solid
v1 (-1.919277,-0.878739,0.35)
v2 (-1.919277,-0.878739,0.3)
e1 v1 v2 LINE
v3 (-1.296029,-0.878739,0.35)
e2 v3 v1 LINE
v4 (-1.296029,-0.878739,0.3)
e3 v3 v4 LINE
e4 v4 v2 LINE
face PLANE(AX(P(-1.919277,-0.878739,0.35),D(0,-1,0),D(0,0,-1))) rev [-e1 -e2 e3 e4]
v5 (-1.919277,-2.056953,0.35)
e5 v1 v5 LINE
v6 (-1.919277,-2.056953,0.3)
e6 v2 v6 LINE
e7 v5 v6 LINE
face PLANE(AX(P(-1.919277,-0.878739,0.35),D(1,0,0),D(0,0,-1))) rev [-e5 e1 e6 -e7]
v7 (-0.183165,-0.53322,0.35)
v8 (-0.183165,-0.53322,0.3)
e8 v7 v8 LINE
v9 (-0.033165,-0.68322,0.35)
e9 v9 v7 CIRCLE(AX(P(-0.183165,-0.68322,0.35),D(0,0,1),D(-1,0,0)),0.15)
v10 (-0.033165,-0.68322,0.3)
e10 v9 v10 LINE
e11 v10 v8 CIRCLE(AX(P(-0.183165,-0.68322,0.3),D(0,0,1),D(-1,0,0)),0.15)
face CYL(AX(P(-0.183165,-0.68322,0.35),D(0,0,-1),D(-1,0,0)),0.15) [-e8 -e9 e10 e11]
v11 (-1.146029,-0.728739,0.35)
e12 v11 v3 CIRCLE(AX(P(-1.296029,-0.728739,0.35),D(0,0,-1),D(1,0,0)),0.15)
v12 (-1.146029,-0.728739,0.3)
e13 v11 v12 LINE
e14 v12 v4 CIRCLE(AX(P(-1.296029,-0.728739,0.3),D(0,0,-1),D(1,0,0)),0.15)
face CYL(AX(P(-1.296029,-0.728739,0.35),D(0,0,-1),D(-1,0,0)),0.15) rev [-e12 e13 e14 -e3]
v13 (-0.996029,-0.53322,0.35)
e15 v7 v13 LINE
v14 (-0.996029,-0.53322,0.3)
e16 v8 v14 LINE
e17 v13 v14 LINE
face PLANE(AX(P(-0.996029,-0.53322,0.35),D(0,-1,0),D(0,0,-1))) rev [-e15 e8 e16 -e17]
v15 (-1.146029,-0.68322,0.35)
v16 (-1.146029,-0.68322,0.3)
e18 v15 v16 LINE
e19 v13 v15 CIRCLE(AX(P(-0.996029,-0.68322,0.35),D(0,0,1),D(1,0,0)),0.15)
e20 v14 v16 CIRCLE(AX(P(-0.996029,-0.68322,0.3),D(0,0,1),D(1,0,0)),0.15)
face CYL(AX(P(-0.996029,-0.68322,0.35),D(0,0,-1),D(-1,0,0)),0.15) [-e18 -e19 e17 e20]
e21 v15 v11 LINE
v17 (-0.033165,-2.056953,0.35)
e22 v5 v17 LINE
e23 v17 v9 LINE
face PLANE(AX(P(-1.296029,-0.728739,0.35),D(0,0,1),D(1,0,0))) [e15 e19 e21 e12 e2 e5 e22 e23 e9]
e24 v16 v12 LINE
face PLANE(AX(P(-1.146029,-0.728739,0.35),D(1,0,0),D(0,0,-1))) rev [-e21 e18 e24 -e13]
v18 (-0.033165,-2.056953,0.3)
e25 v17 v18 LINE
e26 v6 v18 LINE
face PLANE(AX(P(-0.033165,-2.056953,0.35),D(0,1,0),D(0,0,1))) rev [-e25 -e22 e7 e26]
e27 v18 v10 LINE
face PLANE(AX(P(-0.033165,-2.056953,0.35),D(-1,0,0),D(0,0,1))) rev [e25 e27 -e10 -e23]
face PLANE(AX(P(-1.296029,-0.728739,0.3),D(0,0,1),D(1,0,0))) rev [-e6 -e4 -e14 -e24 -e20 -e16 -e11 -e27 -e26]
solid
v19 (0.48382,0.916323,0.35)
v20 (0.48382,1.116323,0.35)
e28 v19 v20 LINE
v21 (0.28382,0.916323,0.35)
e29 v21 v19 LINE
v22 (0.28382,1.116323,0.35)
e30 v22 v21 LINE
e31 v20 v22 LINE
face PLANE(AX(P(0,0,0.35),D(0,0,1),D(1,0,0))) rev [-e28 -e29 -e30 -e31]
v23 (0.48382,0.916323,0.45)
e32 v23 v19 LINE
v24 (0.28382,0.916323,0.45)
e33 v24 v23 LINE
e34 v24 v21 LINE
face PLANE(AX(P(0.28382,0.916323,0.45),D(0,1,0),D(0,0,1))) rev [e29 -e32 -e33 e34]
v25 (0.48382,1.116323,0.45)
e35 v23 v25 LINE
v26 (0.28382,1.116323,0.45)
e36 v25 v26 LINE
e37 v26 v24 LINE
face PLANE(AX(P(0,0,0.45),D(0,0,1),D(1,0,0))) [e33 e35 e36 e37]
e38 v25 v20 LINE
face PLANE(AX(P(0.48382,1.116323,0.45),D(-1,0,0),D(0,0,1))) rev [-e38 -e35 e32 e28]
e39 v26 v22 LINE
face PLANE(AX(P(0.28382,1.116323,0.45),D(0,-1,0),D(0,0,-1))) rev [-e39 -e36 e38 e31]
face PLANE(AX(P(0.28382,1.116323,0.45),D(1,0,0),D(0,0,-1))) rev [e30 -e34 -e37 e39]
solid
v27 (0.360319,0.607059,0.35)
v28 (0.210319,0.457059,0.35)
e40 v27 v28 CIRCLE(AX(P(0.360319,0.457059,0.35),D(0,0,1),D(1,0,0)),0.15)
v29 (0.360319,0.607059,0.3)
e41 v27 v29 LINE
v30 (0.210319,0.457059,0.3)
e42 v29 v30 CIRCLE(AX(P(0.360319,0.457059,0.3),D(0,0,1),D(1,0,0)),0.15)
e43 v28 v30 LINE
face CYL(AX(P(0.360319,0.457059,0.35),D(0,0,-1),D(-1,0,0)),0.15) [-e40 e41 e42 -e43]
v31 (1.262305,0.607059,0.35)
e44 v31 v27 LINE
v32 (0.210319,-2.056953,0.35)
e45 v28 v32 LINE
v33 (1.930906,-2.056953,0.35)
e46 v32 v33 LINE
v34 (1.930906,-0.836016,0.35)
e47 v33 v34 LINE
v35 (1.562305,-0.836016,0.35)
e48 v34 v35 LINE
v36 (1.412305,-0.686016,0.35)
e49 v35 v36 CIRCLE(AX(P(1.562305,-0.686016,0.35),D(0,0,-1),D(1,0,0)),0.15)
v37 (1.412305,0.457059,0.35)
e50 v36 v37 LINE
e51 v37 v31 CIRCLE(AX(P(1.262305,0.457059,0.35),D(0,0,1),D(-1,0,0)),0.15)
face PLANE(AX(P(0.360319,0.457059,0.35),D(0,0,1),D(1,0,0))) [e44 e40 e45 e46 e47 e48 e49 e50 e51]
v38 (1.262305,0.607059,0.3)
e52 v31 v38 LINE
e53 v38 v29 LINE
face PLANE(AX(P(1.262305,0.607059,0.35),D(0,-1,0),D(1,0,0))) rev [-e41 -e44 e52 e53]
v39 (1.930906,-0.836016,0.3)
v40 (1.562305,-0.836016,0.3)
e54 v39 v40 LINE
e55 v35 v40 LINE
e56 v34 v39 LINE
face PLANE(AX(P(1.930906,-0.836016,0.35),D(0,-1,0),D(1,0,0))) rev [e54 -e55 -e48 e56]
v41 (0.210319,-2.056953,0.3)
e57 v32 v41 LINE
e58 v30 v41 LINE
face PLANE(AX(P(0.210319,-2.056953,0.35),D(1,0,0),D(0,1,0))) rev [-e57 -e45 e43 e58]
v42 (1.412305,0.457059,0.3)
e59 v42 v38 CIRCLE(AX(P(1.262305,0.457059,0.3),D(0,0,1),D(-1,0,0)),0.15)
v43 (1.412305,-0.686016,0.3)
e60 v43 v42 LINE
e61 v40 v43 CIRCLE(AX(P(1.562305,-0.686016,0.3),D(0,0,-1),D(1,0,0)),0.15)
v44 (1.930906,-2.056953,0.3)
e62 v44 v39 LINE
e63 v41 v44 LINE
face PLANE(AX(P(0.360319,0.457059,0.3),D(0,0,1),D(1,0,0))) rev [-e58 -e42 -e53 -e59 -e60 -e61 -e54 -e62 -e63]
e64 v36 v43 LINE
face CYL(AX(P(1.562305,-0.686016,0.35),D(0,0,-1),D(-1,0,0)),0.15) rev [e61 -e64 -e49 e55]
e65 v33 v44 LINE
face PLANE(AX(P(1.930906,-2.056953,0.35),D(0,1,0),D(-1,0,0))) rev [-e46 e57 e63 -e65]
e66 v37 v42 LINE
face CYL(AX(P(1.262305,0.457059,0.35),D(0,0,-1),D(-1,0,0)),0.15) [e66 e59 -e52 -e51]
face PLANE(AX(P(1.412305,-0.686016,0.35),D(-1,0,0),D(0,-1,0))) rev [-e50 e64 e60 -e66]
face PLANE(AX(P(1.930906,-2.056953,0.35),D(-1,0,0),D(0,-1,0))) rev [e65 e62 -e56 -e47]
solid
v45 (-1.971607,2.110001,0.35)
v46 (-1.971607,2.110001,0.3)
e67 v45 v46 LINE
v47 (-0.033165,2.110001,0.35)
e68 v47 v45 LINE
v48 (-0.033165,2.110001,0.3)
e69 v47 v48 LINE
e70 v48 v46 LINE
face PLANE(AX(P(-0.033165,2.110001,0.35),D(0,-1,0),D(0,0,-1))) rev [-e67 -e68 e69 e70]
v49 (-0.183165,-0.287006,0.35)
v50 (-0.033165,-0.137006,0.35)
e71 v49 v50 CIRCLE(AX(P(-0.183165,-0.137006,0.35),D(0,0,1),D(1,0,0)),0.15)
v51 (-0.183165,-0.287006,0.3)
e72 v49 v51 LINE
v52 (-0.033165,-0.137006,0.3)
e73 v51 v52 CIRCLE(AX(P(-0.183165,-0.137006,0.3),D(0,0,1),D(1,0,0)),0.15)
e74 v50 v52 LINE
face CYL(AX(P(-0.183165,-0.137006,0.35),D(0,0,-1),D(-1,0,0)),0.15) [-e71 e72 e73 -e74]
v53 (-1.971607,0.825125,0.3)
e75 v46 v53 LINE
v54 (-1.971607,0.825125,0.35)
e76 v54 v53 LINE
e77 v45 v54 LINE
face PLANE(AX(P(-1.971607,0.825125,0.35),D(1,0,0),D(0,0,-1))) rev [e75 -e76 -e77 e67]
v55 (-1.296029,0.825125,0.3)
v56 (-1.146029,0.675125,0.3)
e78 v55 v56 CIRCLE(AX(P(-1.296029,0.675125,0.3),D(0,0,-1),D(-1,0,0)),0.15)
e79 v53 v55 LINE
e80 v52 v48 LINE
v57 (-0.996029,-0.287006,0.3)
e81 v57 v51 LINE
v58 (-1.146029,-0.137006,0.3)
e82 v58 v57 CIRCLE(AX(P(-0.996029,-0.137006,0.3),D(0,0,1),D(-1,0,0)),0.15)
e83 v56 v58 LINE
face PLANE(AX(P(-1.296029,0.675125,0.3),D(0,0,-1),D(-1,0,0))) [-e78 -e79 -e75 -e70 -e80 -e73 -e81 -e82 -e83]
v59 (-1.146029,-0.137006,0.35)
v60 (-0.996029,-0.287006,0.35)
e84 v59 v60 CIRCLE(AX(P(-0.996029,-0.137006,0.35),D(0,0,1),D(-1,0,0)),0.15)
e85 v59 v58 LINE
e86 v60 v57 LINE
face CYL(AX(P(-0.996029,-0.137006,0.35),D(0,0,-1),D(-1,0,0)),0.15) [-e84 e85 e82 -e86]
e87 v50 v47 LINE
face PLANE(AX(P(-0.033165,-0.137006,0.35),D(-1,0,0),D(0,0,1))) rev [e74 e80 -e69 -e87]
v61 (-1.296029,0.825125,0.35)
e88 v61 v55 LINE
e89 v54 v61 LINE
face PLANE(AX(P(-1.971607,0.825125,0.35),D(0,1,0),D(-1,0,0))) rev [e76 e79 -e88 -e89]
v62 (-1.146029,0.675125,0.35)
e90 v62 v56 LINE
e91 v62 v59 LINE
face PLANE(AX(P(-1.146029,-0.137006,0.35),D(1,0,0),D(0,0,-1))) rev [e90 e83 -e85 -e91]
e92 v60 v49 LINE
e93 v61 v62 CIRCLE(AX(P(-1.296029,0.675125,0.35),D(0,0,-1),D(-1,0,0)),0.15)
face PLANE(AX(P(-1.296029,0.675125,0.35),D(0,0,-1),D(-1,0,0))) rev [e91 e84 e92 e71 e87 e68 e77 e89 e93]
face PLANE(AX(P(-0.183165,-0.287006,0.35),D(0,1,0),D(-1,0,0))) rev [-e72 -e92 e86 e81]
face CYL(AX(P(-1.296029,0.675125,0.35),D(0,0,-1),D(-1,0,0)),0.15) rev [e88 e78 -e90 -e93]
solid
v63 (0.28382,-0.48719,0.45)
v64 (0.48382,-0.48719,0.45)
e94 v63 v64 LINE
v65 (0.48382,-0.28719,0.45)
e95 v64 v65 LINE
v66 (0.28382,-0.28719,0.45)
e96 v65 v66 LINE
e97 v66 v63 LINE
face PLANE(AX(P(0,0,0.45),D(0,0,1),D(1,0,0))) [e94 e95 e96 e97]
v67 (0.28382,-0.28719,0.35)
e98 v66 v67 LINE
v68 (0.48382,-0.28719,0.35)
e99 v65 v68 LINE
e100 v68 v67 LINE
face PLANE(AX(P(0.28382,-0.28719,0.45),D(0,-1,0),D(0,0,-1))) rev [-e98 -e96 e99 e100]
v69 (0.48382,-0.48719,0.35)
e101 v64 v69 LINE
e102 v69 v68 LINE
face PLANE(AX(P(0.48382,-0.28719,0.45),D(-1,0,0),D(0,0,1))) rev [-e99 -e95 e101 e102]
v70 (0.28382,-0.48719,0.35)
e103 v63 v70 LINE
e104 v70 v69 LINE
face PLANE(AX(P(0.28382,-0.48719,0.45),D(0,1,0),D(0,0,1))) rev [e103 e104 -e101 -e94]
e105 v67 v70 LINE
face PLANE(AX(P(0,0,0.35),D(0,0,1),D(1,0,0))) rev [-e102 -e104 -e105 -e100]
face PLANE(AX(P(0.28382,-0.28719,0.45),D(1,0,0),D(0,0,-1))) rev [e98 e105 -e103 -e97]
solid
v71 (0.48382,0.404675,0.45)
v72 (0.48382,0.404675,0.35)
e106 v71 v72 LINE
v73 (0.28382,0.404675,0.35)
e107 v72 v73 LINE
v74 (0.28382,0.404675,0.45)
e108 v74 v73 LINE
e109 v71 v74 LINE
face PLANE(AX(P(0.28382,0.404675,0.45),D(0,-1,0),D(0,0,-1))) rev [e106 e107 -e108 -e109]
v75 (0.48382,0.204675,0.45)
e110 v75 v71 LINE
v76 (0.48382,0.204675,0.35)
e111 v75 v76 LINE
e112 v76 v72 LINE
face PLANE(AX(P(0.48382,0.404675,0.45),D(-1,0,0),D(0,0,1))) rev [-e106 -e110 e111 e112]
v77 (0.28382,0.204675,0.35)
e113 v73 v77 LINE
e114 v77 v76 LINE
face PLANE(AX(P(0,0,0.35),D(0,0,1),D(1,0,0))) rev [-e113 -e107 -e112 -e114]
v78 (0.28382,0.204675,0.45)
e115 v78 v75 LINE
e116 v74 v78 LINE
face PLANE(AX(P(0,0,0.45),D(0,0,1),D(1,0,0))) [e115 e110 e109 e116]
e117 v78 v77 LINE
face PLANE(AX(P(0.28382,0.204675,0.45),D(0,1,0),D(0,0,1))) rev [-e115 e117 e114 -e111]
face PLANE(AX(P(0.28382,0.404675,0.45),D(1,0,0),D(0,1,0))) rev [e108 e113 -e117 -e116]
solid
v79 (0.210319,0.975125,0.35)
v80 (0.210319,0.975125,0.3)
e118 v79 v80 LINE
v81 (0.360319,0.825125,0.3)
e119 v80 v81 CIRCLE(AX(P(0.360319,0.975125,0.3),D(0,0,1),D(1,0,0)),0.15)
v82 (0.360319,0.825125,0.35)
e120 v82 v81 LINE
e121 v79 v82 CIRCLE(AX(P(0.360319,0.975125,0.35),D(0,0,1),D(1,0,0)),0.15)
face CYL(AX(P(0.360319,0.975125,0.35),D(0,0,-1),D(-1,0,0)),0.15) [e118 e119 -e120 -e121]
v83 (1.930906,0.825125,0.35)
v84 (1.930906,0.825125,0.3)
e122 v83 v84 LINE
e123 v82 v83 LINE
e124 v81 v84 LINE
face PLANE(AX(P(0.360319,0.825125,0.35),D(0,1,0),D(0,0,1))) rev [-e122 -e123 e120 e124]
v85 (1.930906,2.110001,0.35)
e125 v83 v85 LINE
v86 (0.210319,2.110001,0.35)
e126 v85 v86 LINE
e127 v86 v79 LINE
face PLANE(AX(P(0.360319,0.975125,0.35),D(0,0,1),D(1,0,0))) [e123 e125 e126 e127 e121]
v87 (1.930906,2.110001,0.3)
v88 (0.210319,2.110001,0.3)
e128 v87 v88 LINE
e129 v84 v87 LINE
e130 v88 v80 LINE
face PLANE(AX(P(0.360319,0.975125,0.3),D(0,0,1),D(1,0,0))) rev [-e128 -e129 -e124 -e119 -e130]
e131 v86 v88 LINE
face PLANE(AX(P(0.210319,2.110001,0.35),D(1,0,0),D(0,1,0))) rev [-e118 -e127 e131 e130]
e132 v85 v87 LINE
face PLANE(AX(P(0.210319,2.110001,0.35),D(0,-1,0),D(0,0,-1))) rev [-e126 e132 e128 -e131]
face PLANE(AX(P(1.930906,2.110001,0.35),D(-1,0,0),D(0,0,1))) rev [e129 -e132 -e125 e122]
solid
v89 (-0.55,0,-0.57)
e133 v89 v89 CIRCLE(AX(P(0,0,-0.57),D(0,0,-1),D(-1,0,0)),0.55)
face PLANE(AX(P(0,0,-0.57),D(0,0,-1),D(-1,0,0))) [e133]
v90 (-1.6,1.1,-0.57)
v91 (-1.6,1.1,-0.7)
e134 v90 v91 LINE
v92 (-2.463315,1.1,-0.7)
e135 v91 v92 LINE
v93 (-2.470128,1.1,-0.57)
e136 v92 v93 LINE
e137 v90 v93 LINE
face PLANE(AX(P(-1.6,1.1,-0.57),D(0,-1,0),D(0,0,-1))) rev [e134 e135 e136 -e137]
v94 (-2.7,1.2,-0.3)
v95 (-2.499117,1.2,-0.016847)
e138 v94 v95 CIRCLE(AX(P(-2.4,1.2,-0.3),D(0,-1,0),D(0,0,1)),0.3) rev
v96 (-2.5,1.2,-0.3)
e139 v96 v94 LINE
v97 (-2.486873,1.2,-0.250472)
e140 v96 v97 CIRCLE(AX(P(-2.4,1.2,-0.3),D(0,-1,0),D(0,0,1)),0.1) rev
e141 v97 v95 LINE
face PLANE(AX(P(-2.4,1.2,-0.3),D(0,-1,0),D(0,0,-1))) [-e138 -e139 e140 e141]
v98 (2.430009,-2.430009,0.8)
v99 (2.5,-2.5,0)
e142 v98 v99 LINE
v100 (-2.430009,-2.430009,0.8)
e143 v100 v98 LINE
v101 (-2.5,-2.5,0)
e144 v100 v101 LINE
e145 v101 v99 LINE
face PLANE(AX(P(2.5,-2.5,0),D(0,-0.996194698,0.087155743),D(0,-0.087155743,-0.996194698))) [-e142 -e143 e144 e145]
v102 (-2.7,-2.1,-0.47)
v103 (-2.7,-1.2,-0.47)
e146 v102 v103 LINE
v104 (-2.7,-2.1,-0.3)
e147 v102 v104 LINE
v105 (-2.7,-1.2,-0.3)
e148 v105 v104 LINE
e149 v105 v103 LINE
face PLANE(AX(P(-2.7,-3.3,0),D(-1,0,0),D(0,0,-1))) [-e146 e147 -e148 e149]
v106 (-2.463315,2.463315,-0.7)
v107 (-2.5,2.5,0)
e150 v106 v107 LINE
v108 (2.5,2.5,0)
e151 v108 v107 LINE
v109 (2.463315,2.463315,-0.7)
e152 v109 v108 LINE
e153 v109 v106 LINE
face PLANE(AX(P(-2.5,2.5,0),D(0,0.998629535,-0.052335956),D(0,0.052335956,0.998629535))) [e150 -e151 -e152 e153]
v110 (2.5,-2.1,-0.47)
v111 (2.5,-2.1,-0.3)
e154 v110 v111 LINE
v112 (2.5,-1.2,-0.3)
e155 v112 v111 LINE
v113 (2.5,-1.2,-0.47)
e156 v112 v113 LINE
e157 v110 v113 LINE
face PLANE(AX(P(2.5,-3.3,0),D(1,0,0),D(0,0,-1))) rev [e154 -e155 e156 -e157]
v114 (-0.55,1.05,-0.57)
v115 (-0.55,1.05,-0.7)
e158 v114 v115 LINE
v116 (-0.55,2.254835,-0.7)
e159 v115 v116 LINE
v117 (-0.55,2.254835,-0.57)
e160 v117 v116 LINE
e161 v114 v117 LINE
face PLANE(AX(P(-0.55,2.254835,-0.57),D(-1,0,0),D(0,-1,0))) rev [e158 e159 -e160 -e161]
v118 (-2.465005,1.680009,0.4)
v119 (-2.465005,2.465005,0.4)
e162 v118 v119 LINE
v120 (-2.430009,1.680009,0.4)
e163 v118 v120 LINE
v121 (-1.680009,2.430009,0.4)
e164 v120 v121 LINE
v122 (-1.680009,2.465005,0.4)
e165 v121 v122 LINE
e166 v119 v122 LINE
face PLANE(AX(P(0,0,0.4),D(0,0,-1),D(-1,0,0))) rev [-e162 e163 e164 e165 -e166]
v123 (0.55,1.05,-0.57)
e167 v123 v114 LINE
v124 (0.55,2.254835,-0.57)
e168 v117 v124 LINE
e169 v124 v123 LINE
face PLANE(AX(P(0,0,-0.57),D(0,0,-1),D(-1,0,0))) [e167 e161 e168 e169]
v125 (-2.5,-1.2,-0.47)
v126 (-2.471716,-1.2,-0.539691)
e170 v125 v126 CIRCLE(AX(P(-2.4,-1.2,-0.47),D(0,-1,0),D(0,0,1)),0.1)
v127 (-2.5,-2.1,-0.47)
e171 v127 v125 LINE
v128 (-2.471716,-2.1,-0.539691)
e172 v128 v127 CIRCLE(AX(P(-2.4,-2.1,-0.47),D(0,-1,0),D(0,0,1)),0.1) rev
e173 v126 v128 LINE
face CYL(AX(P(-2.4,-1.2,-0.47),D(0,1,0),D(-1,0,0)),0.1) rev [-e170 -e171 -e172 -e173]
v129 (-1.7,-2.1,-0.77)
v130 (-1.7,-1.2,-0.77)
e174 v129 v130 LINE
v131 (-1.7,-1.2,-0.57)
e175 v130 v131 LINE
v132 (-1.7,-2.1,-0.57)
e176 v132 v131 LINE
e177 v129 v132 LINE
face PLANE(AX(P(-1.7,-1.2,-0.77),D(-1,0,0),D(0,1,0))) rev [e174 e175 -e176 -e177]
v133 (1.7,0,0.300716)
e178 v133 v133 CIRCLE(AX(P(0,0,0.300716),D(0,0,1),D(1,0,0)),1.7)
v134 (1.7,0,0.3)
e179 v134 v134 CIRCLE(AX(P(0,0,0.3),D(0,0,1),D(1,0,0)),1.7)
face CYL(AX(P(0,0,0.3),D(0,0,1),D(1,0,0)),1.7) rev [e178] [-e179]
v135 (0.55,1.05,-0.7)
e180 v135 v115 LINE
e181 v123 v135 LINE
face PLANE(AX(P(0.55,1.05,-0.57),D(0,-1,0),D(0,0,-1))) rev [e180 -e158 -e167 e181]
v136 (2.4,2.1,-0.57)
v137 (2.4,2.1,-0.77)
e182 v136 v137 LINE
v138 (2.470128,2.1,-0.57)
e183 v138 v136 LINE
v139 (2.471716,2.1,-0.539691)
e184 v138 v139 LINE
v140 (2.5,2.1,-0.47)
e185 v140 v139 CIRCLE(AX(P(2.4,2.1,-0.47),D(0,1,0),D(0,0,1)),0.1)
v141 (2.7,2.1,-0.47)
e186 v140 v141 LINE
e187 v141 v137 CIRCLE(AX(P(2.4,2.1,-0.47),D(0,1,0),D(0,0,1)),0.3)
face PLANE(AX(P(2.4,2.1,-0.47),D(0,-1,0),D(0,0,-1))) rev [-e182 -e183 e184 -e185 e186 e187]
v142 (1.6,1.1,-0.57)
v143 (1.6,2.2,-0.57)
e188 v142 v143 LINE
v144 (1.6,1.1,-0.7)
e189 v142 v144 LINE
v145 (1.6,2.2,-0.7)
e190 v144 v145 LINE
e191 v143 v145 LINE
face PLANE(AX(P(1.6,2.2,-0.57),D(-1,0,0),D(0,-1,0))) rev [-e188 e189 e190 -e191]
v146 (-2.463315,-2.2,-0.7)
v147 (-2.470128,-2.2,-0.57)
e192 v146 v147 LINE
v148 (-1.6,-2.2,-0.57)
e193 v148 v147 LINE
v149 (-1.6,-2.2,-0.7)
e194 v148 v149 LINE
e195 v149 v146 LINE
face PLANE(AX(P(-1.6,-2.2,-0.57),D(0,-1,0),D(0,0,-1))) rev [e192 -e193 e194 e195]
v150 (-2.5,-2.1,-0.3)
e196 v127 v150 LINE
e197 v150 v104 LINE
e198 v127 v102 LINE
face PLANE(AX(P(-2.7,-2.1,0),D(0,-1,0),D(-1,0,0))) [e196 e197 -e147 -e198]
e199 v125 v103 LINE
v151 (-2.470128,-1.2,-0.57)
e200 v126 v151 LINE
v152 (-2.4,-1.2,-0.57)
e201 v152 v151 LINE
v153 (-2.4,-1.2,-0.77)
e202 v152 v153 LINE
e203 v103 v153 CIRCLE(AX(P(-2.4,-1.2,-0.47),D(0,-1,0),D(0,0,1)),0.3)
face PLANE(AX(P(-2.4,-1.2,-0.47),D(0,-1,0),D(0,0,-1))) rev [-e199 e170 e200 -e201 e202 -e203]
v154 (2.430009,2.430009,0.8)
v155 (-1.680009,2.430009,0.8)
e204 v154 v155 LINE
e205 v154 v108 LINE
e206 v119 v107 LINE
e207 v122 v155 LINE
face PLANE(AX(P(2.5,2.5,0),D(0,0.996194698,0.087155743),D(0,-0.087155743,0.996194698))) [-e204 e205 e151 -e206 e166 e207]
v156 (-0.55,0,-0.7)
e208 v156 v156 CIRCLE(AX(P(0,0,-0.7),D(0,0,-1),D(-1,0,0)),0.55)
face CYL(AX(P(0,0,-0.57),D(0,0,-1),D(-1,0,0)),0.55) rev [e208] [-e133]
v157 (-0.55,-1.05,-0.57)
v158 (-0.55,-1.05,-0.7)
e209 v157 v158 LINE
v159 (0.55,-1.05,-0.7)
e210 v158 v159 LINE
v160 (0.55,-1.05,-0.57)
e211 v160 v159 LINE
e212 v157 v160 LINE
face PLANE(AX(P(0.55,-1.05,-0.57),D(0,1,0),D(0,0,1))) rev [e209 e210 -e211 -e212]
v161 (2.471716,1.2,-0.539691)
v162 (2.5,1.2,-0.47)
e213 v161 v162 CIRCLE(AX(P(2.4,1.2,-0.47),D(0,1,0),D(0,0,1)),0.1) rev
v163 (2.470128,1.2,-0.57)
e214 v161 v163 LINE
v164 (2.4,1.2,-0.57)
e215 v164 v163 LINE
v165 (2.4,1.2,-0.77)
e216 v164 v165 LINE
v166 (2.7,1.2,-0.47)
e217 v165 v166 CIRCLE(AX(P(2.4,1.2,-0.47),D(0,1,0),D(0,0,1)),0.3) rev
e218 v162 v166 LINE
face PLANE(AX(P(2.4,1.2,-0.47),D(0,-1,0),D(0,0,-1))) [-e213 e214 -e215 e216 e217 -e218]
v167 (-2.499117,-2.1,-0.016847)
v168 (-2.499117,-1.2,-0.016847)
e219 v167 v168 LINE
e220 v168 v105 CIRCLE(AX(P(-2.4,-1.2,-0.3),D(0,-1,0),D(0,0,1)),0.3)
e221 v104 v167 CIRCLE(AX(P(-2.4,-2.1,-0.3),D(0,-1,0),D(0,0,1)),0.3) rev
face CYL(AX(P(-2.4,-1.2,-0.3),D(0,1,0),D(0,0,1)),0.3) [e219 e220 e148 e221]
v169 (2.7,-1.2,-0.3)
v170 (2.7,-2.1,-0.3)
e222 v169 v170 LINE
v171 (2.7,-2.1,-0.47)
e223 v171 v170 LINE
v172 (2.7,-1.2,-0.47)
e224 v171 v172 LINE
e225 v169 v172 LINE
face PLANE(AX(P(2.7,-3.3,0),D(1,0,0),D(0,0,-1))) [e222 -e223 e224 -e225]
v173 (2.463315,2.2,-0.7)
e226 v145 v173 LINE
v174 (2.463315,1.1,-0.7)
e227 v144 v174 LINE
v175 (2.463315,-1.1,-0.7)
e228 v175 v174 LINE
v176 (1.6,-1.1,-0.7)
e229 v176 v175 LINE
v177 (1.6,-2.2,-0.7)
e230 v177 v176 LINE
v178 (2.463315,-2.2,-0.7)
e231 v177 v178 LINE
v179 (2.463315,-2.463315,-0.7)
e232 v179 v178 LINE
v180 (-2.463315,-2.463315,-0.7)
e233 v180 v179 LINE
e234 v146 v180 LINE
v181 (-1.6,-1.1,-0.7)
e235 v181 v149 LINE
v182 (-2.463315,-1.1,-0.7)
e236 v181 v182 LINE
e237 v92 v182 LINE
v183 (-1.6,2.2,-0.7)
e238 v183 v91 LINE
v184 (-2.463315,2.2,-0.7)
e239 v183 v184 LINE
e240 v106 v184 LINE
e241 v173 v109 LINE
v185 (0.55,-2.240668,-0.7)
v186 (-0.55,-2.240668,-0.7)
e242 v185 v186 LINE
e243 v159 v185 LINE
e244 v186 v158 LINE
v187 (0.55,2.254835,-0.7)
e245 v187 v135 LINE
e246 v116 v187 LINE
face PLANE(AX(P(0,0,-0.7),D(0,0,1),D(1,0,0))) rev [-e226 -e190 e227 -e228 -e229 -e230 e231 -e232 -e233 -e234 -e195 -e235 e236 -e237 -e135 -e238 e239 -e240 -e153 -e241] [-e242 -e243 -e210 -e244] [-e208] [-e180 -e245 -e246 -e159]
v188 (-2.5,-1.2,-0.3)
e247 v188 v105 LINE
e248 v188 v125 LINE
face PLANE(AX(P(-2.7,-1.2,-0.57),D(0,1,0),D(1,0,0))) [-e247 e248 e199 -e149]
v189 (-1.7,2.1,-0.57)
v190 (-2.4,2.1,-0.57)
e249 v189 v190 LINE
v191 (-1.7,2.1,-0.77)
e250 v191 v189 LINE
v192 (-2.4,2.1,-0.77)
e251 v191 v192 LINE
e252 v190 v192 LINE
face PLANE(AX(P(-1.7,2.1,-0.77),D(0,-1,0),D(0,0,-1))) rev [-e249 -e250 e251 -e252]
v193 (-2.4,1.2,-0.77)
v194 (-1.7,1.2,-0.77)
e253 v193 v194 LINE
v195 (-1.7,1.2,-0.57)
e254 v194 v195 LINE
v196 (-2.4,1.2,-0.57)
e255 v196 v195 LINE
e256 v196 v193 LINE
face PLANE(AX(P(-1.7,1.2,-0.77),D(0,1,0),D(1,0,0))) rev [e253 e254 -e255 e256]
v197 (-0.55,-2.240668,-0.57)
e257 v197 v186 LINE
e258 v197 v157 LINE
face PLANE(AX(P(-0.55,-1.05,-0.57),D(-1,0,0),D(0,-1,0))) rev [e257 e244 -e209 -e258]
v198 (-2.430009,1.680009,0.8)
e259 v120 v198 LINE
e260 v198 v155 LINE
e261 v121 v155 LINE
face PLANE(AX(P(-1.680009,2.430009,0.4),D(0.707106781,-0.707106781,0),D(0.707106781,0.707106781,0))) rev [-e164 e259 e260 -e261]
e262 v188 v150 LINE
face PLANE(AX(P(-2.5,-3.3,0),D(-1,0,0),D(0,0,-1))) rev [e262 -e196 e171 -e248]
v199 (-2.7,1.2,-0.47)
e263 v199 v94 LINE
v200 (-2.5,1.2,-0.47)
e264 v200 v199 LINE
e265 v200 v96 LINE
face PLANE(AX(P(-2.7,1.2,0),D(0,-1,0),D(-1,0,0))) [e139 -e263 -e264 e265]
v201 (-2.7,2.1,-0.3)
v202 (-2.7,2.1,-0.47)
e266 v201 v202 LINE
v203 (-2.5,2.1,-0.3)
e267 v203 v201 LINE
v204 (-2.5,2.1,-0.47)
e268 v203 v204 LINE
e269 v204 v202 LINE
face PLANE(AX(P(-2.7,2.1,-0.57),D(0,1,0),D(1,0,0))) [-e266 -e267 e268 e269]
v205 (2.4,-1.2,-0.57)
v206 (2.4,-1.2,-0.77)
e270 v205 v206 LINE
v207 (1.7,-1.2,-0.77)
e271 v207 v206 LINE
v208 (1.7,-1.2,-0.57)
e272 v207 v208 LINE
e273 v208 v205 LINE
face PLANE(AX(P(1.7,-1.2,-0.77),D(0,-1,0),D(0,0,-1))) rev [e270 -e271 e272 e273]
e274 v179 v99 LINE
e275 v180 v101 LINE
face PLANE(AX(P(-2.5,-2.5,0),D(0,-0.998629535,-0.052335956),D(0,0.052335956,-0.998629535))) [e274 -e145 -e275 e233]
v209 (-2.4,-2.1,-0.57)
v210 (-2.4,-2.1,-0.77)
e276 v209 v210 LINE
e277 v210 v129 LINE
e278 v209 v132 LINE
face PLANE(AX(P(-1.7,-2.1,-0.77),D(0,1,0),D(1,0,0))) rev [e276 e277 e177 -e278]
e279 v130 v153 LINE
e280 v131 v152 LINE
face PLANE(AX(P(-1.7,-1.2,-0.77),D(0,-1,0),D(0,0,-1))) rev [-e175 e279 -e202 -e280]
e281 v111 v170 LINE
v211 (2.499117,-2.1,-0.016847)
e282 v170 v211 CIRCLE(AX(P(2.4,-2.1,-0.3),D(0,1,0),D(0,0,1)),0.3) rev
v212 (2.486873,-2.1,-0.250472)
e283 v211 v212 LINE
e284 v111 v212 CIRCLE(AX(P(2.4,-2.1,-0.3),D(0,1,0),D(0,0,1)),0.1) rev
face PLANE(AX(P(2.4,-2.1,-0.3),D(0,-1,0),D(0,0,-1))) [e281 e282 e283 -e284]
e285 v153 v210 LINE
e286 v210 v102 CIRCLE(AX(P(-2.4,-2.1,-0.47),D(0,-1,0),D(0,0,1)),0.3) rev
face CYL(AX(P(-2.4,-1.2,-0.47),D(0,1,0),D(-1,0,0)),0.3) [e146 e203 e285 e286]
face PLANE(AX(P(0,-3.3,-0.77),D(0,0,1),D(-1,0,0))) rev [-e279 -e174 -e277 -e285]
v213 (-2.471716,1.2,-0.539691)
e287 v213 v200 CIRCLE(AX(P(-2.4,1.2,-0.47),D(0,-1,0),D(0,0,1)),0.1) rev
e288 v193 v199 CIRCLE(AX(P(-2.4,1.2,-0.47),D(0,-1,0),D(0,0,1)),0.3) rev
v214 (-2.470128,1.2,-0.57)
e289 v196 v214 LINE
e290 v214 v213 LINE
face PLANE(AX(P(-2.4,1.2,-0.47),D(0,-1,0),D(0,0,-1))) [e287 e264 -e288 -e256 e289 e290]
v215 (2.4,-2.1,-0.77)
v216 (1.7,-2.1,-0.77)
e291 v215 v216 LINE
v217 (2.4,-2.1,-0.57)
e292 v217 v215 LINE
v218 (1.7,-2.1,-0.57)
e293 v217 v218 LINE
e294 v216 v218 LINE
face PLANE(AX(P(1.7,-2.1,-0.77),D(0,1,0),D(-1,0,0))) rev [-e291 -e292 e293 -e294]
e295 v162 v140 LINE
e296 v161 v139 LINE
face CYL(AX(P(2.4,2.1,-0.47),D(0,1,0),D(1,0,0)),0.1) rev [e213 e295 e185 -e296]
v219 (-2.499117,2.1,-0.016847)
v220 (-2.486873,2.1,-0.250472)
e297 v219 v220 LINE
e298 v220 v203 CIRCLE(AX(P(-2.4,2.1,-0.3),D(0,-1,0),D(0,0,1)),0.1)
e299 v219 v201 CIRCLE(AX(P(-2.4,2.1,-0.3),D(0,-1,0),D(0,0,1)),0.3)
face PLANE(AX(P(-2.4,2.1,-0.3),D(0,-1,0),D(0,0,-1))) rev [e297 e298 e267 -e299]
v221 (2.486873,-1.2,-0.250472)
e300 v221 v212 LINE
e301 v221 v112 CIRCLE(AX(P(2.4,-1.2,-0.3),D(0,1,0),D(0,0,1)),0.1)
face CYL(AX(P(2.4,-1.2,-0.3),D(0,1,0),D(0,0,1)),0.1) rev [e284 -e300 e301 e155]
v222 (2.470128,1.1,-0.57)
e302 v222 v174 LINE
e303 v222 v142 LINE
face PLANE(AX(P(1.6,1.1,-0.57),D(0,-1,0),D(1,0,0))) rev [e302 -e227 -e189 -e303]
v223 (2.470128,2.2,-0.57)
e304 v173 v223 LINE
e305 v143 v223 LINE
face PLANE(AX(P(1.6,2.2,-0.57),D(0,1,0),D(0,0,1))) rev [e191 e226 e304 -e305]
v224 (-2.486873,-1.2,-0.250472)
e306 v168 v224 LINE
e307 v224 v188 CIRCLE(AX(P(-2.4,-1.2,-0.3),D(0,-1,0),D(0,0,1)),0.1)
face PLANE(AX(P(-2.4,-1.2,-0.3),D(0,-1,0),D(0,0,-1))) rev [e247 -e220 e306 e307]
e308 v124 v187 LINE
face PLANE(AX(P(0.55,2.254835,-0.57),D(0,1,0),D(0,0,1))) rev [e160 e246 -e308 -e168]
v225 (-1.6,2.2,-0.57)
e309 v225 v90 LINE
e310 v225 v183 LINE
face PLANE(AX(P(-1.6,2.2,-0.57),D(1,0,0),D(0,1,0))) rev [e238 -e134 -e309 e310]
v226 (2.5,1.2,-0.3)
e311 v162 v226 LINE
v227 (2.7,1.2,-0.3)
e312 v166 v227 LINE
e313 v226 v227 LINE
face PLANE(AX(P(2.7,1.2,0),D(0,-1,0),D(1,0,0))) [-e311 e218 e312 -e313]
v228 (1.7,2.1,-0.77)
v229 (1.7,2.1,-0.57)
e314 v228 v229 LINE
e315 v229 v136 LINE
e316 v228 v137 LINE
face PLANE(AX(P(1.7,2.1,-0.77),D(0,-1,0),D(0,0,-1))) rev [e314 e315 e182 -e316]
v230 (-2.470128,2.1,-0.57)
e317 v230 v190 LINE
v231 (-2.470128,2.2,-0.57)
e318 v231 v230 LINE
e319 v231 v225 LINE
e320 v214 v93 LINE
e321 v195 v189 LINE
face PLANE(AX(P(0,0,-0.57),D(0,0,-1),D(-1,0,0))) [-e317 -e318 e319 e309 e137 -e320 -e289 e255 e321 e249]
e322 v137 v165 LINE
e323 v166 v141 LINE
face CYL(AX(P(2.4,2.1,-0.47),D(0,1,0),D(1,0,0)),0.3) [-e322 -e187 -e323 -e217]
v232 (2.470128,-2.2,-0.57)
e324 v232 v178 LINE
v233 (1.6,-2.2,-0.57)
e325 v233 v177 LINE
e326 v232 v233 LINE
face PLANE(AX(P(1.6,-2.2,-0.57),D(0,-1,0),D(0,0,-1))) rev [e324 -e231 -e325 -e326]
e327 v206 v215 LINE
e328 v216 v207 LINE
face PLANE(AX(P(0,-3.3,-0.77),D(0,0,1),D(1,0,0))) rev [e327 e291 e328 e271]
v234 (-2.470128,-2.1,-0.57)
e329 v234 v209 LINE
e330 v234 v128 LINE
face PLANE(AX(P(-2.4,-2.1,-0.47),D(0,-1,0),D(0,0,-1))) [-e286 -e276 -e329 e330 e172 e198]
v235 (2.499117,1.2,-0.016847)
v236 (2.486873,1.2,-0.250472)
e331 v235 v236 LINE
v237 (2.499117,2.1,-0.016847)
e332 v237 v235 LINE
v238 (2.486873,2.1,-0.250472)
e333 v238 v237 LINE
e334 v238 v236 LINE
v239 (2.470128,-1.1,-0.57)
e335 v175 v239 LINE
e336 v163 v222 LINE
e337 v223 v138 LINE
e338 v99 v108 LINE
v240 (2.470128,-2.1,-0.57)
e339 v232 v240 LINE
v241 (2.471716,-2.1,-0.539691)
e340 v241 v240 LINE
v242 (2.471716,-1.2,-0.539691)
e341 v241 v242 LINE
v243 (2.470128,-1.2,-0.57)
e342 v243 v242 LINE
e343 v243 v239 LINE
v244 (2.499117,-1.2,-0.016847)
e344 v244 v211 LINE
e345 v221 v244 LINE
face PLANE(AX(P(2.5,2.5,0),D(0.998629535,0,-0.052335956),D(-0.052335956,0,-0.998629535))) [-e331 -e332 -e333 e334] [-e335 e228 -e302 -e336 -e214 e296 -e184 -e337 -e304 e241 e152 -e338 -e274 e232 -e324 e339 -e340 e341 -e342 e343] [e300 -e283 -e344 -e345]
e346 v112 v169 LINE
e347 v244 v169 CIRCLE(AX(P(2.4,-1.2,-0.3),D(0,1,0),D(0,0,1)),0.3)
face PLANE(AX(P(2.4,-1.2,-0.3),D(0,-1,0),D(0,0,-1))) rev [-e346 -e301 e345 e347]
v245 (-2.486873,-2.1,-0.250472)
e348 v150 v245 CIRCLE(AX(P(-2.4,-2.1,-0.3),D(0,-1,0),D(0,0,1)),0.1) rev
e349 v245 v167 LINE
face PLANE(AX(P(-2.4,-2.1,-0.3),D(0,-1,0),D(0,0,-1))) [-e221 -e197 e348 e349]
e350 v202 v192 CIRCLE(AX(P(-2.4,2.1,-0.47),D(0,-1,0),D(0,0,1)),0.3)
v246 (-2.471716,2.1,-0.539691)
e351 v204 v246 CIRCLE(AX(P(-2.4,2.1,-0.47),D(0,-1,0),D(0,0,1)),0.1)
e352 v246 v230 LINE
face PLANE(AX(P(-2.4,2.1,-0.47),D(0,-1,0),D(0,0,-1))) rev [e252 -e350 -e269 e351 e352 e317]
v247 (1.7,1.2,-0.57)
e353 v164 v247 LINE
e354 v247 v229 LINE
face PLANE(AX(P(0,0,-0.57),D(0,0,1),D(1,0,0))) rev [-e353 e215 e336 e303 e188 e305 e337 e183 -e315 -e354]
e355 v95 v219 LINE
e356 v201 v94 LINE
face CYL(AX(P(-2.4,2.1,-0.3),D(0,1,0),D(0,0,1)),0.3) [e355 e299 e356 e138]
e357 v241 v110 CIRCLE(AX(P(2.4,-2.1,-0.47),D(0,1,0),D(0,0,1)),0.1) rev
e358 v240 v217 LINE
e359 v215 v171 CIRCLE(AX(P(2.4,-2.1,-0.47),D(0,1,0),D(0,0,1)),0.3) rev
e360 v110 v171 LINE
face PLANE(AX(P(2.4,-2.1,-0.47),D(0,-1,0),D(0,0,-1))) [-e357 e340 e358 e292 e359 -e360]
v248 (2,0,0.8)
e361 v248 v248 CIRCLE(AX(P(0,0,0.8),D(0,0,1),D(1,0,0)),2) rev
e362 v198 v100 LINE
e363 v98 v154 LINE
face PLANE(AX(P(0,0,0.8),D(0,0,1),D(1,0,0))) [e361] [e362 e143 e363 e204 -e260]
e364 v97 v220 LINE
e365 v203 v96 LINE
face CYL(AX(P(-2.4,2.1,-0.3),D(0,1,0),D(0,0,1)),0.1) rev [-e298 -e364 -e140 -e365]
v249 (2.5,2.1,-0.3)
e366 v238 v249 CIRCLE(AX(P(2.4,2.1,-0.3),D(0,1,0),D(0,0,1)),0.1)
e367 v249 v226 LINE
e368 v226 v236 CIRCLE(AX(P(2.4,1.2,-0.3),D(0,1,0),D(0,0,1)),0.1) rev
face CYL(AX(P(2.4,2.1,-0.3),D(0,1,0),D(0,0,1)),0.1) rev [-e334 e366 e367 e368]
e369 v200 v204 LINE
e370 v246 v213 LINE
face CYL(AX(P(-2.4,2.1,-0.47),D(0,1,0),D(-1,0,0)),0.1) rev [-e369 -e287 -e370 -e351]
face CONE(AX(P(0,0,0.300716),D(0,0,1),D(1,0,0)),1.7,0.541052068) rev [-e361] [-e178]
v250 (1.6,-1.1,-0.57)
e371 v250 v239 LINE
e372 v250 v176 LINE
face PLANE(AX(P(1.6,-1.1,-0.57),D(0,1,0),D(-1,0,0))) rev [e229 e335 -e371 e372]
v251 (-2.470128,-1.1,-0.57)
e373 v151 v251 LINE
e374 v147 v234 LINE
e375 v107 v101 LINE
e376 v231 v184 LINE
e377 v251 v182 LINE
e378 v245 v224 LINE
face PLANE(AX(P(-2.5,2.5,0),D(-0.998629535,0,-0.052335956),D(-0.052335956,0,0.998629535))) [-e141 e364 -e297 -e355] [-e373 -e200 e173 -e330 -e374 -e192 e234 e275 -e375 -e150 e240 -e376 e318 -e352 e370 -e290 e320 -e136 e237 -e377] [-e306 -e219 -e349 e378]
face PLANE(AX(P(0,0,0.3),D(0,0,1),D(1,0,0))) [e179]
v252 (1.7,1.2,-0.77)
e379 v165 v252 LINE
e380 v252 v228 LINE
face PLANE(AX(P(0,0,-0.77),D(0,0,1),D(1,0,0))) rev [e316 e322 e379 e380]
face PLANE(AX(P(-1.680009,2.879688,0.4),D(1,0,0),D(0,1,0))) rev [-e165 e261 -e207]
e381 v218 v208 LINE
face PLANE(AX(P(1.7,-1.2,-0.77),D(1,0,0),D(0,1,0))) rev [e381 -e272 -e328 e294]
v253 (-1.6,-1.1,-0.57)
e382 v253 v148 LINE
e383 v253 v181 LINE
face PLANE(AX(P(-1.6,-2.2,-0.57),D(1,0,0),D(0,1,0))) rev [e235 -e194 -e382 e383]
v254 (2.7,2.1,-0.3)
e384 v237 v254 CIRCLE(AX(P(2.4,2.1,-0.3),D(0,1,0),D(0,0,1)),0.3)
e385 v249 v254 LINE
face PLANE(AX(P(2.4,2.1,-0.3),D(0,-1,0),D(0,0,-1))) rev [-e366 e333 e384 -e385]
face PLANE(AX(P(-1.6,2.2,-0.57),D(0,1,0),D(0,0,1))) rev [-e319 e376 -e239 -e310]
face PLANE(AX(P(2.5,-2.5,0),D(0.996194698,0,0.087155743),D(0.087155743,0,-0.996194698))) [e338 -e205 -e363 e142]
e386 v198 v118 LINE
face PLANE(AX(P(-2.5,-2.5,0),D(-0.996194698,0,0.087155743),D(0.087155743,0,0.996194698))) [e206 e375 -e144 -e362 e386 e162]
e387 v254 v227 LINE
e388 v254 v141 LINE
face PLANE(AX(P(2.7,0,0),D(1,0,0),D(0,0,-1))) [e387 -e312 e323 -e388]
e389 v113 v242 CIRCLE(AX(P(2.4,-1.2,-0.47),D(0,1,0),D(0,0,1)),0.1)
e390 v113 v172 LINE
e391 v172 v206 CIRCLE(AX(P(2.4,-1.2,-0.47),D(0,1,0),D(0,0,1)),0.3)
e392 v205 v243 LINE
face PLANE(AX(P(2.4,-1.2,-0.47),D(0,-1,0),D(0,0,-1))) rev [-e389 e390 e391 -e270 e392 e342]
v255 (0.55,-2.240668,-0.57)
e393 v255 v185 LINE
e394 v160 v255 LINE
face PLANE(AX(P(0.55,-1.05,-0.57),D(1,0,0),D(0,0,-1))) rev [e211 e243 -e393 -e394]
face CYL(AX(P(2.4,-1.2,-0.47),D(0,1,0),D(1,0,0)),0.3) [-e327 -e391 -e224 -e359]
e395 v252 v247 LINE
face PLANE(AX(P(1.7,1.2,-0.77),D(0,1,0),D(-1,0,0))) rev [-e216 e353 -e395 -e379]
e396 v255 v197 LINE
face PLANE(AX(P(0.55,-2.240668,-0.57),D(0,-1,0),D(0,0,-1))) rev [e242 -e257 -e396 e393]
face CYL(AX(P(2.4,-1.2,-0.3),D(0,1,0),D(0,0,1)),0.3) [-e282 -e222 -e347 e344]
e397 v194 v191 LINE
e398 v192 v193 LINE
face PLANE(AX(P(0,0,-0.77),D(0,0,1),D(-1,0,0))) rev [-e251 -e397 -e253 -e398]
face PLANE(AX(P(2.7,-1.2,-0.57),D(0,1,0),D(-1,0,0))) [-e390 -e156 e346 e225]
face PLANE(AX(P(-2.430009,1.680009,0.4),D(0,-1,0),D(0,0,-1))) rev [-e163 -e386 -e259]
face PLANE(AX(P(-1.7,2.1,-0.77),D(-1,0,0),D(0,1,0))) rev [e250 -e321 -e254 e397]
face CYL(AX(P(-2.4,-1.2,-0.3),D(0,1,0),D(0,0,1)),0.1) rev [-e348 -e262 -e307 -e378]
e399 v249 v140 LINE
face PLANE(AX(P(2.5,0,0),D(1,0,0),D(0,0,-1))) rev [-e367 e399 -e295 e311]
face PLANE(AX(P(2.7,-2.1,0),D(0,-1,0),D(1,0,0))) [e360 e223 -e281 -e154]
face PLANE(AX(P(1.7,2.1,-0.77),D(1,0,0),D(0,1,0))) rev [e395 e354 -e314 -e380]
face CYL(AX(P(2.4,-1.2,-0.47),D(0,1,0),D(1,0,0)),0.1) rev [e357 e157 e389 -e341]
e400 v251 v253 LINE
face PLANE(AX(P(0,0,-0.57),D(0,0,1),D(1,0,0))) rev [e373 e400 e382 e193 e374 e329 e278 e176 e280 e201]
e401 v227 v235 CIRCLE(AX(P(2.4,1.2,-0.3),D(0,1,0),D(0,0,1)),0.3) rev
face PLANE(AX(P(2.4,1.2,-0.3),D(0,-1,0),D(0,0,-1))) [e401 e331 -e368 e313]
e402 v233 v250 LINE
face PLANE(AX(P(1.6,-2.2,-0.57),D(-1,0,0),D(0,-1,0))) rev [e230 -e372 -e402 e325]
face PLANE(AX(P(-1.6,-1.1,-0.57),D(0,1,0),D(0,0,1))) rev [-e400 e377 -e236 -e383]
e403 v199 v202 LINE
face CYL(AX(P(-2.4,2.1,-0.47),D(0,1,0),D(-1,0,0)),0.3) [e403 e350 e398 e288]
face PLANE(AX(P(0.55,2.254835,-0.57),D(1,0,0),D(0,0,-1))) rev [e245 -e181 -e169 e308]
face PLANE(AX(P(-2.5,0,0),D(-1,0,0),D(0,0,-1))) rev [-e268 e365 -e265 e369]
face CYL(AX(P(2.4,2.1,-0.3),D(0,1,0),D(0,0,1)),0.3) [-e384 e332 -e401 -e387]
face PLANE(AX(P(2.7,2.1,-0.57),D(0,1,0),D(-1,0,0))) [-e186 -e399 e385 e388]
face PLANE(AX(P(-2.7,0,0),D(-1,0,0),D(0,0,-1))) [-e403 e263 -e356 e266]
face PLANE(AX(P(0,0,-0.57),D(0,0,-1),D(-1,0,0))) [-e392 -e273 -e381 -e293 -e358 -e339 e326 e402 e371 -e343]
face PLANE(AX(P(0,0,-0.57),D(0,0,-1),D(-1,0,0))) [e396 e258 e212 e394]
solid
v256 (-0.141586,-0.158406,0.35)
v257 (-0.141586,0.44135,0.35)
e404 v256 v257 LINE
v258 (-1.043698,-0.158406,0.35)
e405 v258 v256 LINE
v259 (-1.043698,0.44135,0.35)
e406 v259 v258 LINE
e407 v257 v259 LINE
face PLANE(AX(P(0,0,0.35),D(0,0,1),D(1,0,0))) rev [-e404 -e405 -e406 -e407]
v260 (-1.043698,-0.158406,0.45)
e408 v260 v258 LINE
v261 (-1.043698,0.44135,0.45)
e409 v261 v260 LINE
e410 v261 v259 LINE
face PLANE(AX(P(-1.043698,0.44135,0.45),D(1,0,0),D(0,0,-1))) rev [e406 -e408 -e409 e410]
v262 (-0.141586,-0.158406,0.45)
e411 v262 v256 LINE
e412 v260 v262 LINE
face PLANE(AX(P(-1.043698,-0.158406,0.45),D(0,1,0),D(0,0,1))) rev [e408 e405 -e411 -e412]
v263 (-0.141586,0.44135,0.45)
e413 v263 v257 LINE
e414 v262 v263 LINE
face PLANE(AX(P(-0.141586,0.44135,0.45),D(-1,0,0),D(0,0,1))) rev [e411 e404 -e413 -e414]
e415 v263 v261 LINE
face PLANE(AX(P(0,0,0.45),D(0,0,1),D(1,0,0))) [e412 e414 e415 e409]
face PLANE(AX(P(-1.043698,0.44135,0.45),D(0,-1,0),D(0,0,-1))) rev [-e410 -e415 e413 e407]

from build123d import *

# Parameters (mm, degrees)
SKETCH_1_W                       = 5
SKETCH_1_H                       = 5
EXTRUDE_1_DEPTH                  = 0.7
EXTRUDE_1_DRAFT                  = -3
SKETCH_3_R                       = 0.55
SKETCH_3_W                       = 1.424481166
SKETCH_3_H                       = 1.1
SKETCH_3_W_2                     = 1.1
SKETCH_3_H_2                     = 1.20483499
SKETCH_3_H_3                     = 1.190667693
SKETCH_3_W_3                     = 1.035065358
SKETCH_3_W_4                     = 1.548034511
CUT_EXTRUDE_1_DEPTH              = 0.13
SKETCH_5_W                       = 0.8
SKETCH_5_H                       = 0.9
SM_BASE_FLANGE_1_DEPTH           = 0.2
SM_EDGE_FLANGE_1_STRIP_W         = 1
SM_EDGE_FLANGE_1_STRIP_H         = 0.2
SM_EDGE_FLANGE_1_STRIP_CUT_DEPTH = 0.9
SM_EDGE_FLANGE_1_DEPTH           = 0.9
SM_EDGE_FLANGE_2_STRIP_W         = 1
SM_EDGE_FLANGE_2_STRIP_H         = 0.2
SM_EDGE_FLANGE_2_STRIP_CUT_DEPTH = 0.9
SM_EDGE_FLANGE_2_DEPTH           = 0.9
PATTERN_LINEAR_1_COUNT           = 2
PATTERN_LINEAR_1_PITCH           = 3.3
SKETCH_30_W                      = 5
SKETCH_30_H                      = 5
EXTRUDE_3_DEPTH                  = 0.8
EXTRUDE_3_TAPER                  = 5
CUT_EXTRUDE_2_DEPTH              = 0.4
SKETCH_34_R                      = 1.7
CUT_EXTRUDE_3_DEPTH              = 0.5
CHAMFER_1_SIZE                   = 0.3
CHAMFER_1_SIZE2                  = 0.499283845
EXTRUDE_4_DEPTH                  = 0.05
EXTRUDE_4_2_DEPTH                = 0.05
EXTRUDE_4_3_DEPTH                = 0.05
EXTRUDE_4_4_DEPTH                = 0.05
SKETCH_49_W                      = 0.902111922
SKETCH_49_H                      = 0.599755728
EXTRUDE_5_DEPTH                  = 0.1
SKETCH_49_W_2                    = 0.2
SKETCH_49_H_2                    = 0.2
EXTRUDE_5_2_DEPTH                = 0.1
EXTRUDE_5_3_DEPTH                = 0.1
EXTRUDE_5_4_DEPTH                = 0.1


# Sheet-metal steps are written as plain solids
with BuildPart() as part:
    # Sketch 1 → Бобышка-Вытянуть1 (with draft: the straight prism first)
    with BuildSketch(Plane.XY):
        Rectangle(SKETCH_1_W, SKETCH_1_H)
    extrude(amount=-EXTRUDE_1_DEPTH)
    # Бобышка-Вытянуть1: the draft: its side faces are tilted about the plane it starts from
    extrude_1_sides = [part.faces().sort_by_distance(p)[0] for p in [
        (-2.5, 0, -0.35),
        (0, -2.5, -0.35),
        (2.5, 0, -0.35),
        (0, 2.5, -0.35),
    ]]
    draft(extrude_1_sides, Plane.XY, EXTRUDE_1_DRAFT)

    # Sketch 3 → Вырез-Вытянуть1 (cut)
    with BuildSketch(Plane(origin=(0, 0, -0.7), x_dir=(-1, 0, 0), z_dir=(0, 0, -1))):
        Circle(SKETCH_3_R)
        with Locations((-2.312240583, 1.65)):
            Rectangle(SKETCH_3_W, SKETCH_3_H)
        with Locations((0, 1.652417495)):
            Rectangle(SKETCH_3_W_2, SKETCH_3_H_2)
        with Locations((0, -1.645333847)):
            Rectangle(SKETCH_3_W_2, SKETCH_3_H_3)
        with Locations((2.117532679, 1.65)):
            Rectangle(SKETCH_3_W_3, SKETCH_3_H)
        with Locations((-2.374017256, -1.65)):
            Rectangle(SKETCH_3_W_4, SKETCH_3_H)
        with Locations((2.117532679, -1.65)):
            Rectangle(SKETCH_3_W_3, SKETCH_3_H)
    extrude(amount=-CUT_EXTRUDE_1_DEPTH, mode=Mode.SUBTRACT)



with BuildPart() as body_2:
    # Sketch 5 → Базовая кромка1 (new body)
    with BuildSketch(Plane(origin=(0, 0, -0.57), x_dir=(-1, 0, 0), z_dir=(0, 0, -1))):
        with Locations((-2.1, 1.65)):
            Rectangle(SKETCH_5_W, SKETCH_5_H)
    extrude(amount=SM_BASE_FLANGE_1_DEPTH)

    # Ребро-кромка1 strip (across the edge) → Ребро-кромка1 strip cut (cut)
    with BuildSketch(Plane(origin=(2.5, 1.2, -0.57), x_dir=(-1, 0, 0), z_dir=(0, 1, 0))):
        with Locations((-0.4, -0.1)):
            Rectangle(SM_EDGE_FLANGE_1_STRIP_W, SM_EDGE_FLANGE_1_STRIP_H)
    extrude(amount=SM_EDGE_FLANGE_1_STRIP_CUT_DEPTH, mode=Mode.SUBTRACT)

    # Ребро-кромка1 section (across the edge) → Ребро-кромка1 (add)
    with BuildSketch(Plane(origin=(2.5, 1.2, -0.57), x_dir=(-1, 0, 0), z_dir=(0, 1, 0))):
        with BuildLine():
            Line((-0.2, 0.1), (-0.2, 0.57))
            Line((-0.2, 0.57), (0, 0.57))
            Line((0, 0.57), (0, 0.1))
            ThreePointArc((0, 0.1), (0.029289322, 0.029289322), (0.1, 0))
            Line((0.1, 0), (0.1, -0.2))
            ThreePointArc((0.1, -0.2), (-0.112132034, -0.112132034), (-0.2, 0.1))
        make_face()
    extrude(amount=SM_EDGE_FLANGE_1_DEPTH)

    # Ребро-кромка2 strip (across the edge) → Ребро-кромка2 strip cut (cut)
    with BuildSketch(Plane(origin=(2.5, 1.2, 0), x_dir=(0, 0, -1), z_dir=(0, 1, 0))):
        with Locations((-0.2, -0.1)):
            Rectangle(SM_EDGE_FLANGE_2_STRIP_W, SM_EDGE_FLANGE_2_STRIP_H)
    extrude(amount=SM_EDGE_FLANGE_2_STRIP_CUT_DEPTH, mode=Mode.SUBTRACT)

    # Ребро-кромка2 section (across the edge) → Ребро-кромка2 (add)
    with BuildSketch(Plane(origin=(2.5, 1.2, 0), x_dir=(0, 0, -1), z_dir=(0, 1, 0))):
        with BuildLine():
            Line((0, 0.1), (0, 0.4))
            Line((0, 0.4), (0.2, 0.4))
            Line((0.2, 0.4), (0.2, 0.1))
            ThreePointArc((0.2, 0.1), (0.229289322, 0.029289322), (0.3, 0))
            Line((0.3, 0), (0.3, -0.2))
            ThreePointArc((0.3, -0.2), (0.087867966, -0.112132034), (0, 0.1))
        make_face()
    extrude(amount=SM_EDGE_FLANGE_2_DEPTH)


with BuildPart() as pattern_linear_1_1:
    # Линейный массив1: pattern copy
    add(body_2.part.moved(Location(Vector(0, -1, 0) * (1 * PATTERN_LINEAR_1_PITCH))))


with BuildPart() as body_4:
    # Зеркальное отражение1: mirrored copy
    add(body_2.part.mirror(Plane(origin=(0, 0, 0), x_dir=(0, 0, 1), z_dir=(1, 0, 0))))


with BuildPart() as body_5:
    # Mirror 1 2: mirrored copy
    add(pattern_linear_1_1.part.mirror(Plane(origin=(0, 0, 0), x_dir=(0, 0, 1), z_dir=(1, 0, 0))))


with BuildPart() as part_1:
    add(part.part)

    add(body_2.part)  # Бобышка-Вытянуть3 merges body 2

    add(pattern_linear_1_1.part)  # Бобышка-Вытянуть3 merges Линейный массив1_1

    add(body_4.part)  # Бобышка-Вытянуть3 merges body 4

    add(body_5.part)  # Бобышка-Вытянуть3 merges body 5
    # Эскиз30 → Бобышка-Вытянуть3 (add)
    with BuildSketch(Plane.XY):
        Rectangle(SKETCH_30_W, SKETCH_30_H)
    extrude(amount=EXTRUDE_3_DEPTH, taper=EXTRUDE_3_TAPER)

    # Эскиз33 → Вырез-Вытянуть2 (cut)
    with BuildSketch(Plane.XY.offset(0.8)):
        Polygon((-1.680009069, 2.430009069), (-2.430009069, 1.680009069), (-2.879687624, 1.680009069), (-2.879687624, 2.879687624), (-1.680009069, 2.879687624), align=None)
    extrude(amount=-CUT_EXTRUDE_2_DEPTH, mode=Mode.SUBTRACT)

    # Эскиз34 → Вырез-Вытянуть3 (cut)
    with BuildSketch(Plane.XY.offset(0.8)):
        Circle(SKETCH_34_R)
    extrude(amount=-CUT_EXTRUDE_3_DEPTH, mode=Mode.SUBTRACT)

    # Фаска1
    chamfer_1_edges = [part_1.edges().sort_by_distance(p)[0] for p in [
        (-1.7, 0, 0.8),
    ]]
    chamfer_1_side = [part_1.faces().sort_by_distance(p)[0] for p in [
        (0, -2.361278034, 0.8),
    ]]
    chamfer(chamfer_1_edges, length=CHAMFER_1_SIZE, length2=CHAMFER_1_SIZE2, reference=chamfer_1_side[0])


with BuildPart() as body_2_2:
    # Эскиз48 → Бобышка-Вытянуть4 (new body)
    with BuildSketch(Plane.XY.offset(0.3)):
        with BuildLine():
            Line((0.210318716, -2.05695293), (0.210318716, 0.457058905))
            ThreePointArc((0.210318716, 0.457058905), (0.254252699, 0.563124922), (0.360318716, 0.607058905))
            Line((0.360318716, 0.607058905), (1.262305442, 0.607058905))
            ThreePointArc((1.262305442, 0.607058905), (1.36837146, 0.563124922), (1.412305442, 0.457058905))
            Line((1.412305442, 0.457058905), (1.412305442, -0.686015987))
            ThreePointArc((1.412305442, -0.686015987), (1.456239425, -0.792082004), (1.562305442, -0.836015987))
            Line((1.562305442, -0.836015987), (1.930905545, -0.836015987))
            Line((1.930905545, -0.836015987), (1.930905545, -2.05695293))
            Line((1.930905545, -2.05695293), (0.210318716, -2.05695293))
        make_face()
    extrude(amount=EXTRUDE_4_DEPTH)


with BuildPart() as body_3:
    # Эскиз48 → Extrude 4 2 (new body)
    with BuildSketch(Plane.XY.offset(0.3)):
        with BuildLine():
            Line((0.210318716, 2.110000815), (1.930905545, 2.110000815))
            Line((1.930905545, 2.110000815), (1.930905545, 0.825125098))
            Line((1.930905545, 0.825125098), (0.360318716, 0.825125098))
            ThreePointArc((0.360318716, 0.825125098), (0.254252699, 0.869059081), (0.210318716, 0.975125098))
            Line((0.210318716, 0.975125098), (0.210318716, 2.110000815))
        make_face()
    extrude(amount=EXTRUDE_4_2_DEPTH)


with BuildPart() as body_4_2:
    # Эскиз48 → Extrude 4 3 (new body)
    with BuildSketch(Plane.XY.offset(0.3)):
        with BuildLine():
            Line((-0.033165046, -2.05695293), (-0.033165046, -0.683219524))
            ThreePointArc((-0.033165046, -0.683219524), (-0.077099029, -0.577153506), (-0.183165046, -0.533219524))
            Line((-0.183165046, -0.533219524), (-0.996028626, -0.533219524))
            ThreePointArc((-0.996028626, -0.533219524), (-1.102094643, -0.577153506), (-1.146028626, -0.683219524))
            Line((-1.146028626, -0.683219524), (-1.146028626, -0.728739244))
            ThreePointArc((-1.146028626, -0.728739244), (-1.189962609, -0.834805261), (-1.296028626, -0.878739244))
            Line((-1.296028626, -0.878739244), (-1.919276728, -0.878739244))
            Line((-1.919276728, -0.878739244), (-1.919276728, -2.05695293))
            Line((-1.919276728, -2.05695293), (-0.033165046, -2.05695293))
        make_face()
    extrude(amount=EXTRUDE_4_3_DEPTH)


with BuildPart() as body_5_2:
    # Эскиз48 → Extrude 4 4 (new body)
    with BuildSketch(Plane.XY.offset(0.3)):
        with BuildLine():
            Line((-0.033165046, 2.110000815), (-1.971607025, 2.110000815))
            Line((-1.971607025, 2.110000815), (-1.971607025, 0.825125098))
            Line((-1.971607025, 0.825125098), (-1.296028626, 0.825125098))
            ThreePointArc((-1.296028626, 0.825125098), (-1.189962609, 0.781191115), (-1.146028626, 0.675125098))
            Line((-1.146028626, 0.675125098), (-1.146028626, -0.137005614))
            ThreePointArc((-1.146028626, -0.137005614), (-1.102094643, -0.243071632), (-0.996028626, -0.287005614))
            Line((-0.996028626, -0.287005614), (-0.183165046, -0.287005614))
            ThreePointArc((-0.183165046, -0.287005614), (-0.077099029, -0.243071632), (-0.033165046, -0.137005614))
            Line((-0.033165046, -0.137005614), (-0.033165046, 2.110000815))
        make_face()
    extrude(amount=EXTRUDE_4_4_DEPTH)


with BuildPart() as body_6:
    # Эскиз49 → Бобышка-Вытянуть5 (new body)
    with BuildSketch(Plane.XY.offset(0.35)):
        with Locations((-0.592641639, 0.141472266)):
            Rectangle(SKETCH_49_W, SKETCH_49_H)
    extrude(amount=EXTRUDE_5_DEPTH)


with BuildPart() as body_7:
    # Эскиз49 → Extrude 5 2 (new body)
    with BuildSketch(Plane.XY.offset(0.35)):
        with Locations((0.383820167, 1.016322564)):
            Rectangle(SKETCH_49_W_2, SKETCH_49_H_2)
    extrude(amount=EXTRUDE_5_2_DEPTH)


with BuildPart() as body_8:
    # Эскиз49 → Extrude 5 3 (new body)
    with BuildSketch(Plane.XY.offset(0.35)):
        with Locations((0.383820167, 0.304674762)):
            Rectangle(SKETCH_49_W_2, SKETCH_49_H_2)
    extrude(amount=EXTRUDE_5_3_DEPTH)


with BuildPart() as body_9:
    # Эскиз49 → Extrude 5 4 (new body)
    with BuildSketch(Plane.XY.offset(0.35)):
        with Locations((0.383820167, -0.387189749)):
            Rectangle(SKETCH_49_W_2, SKETCH_49_H_2)
    extrude(amount=EXTRUDE_5_4_DEPTH)


solid = Compound([part_1.part, body_2_2.part, body_3.part, body_4_2.part, body_5_2.part, body_6.part, body_7.part, body_8.part, body_9.part])
